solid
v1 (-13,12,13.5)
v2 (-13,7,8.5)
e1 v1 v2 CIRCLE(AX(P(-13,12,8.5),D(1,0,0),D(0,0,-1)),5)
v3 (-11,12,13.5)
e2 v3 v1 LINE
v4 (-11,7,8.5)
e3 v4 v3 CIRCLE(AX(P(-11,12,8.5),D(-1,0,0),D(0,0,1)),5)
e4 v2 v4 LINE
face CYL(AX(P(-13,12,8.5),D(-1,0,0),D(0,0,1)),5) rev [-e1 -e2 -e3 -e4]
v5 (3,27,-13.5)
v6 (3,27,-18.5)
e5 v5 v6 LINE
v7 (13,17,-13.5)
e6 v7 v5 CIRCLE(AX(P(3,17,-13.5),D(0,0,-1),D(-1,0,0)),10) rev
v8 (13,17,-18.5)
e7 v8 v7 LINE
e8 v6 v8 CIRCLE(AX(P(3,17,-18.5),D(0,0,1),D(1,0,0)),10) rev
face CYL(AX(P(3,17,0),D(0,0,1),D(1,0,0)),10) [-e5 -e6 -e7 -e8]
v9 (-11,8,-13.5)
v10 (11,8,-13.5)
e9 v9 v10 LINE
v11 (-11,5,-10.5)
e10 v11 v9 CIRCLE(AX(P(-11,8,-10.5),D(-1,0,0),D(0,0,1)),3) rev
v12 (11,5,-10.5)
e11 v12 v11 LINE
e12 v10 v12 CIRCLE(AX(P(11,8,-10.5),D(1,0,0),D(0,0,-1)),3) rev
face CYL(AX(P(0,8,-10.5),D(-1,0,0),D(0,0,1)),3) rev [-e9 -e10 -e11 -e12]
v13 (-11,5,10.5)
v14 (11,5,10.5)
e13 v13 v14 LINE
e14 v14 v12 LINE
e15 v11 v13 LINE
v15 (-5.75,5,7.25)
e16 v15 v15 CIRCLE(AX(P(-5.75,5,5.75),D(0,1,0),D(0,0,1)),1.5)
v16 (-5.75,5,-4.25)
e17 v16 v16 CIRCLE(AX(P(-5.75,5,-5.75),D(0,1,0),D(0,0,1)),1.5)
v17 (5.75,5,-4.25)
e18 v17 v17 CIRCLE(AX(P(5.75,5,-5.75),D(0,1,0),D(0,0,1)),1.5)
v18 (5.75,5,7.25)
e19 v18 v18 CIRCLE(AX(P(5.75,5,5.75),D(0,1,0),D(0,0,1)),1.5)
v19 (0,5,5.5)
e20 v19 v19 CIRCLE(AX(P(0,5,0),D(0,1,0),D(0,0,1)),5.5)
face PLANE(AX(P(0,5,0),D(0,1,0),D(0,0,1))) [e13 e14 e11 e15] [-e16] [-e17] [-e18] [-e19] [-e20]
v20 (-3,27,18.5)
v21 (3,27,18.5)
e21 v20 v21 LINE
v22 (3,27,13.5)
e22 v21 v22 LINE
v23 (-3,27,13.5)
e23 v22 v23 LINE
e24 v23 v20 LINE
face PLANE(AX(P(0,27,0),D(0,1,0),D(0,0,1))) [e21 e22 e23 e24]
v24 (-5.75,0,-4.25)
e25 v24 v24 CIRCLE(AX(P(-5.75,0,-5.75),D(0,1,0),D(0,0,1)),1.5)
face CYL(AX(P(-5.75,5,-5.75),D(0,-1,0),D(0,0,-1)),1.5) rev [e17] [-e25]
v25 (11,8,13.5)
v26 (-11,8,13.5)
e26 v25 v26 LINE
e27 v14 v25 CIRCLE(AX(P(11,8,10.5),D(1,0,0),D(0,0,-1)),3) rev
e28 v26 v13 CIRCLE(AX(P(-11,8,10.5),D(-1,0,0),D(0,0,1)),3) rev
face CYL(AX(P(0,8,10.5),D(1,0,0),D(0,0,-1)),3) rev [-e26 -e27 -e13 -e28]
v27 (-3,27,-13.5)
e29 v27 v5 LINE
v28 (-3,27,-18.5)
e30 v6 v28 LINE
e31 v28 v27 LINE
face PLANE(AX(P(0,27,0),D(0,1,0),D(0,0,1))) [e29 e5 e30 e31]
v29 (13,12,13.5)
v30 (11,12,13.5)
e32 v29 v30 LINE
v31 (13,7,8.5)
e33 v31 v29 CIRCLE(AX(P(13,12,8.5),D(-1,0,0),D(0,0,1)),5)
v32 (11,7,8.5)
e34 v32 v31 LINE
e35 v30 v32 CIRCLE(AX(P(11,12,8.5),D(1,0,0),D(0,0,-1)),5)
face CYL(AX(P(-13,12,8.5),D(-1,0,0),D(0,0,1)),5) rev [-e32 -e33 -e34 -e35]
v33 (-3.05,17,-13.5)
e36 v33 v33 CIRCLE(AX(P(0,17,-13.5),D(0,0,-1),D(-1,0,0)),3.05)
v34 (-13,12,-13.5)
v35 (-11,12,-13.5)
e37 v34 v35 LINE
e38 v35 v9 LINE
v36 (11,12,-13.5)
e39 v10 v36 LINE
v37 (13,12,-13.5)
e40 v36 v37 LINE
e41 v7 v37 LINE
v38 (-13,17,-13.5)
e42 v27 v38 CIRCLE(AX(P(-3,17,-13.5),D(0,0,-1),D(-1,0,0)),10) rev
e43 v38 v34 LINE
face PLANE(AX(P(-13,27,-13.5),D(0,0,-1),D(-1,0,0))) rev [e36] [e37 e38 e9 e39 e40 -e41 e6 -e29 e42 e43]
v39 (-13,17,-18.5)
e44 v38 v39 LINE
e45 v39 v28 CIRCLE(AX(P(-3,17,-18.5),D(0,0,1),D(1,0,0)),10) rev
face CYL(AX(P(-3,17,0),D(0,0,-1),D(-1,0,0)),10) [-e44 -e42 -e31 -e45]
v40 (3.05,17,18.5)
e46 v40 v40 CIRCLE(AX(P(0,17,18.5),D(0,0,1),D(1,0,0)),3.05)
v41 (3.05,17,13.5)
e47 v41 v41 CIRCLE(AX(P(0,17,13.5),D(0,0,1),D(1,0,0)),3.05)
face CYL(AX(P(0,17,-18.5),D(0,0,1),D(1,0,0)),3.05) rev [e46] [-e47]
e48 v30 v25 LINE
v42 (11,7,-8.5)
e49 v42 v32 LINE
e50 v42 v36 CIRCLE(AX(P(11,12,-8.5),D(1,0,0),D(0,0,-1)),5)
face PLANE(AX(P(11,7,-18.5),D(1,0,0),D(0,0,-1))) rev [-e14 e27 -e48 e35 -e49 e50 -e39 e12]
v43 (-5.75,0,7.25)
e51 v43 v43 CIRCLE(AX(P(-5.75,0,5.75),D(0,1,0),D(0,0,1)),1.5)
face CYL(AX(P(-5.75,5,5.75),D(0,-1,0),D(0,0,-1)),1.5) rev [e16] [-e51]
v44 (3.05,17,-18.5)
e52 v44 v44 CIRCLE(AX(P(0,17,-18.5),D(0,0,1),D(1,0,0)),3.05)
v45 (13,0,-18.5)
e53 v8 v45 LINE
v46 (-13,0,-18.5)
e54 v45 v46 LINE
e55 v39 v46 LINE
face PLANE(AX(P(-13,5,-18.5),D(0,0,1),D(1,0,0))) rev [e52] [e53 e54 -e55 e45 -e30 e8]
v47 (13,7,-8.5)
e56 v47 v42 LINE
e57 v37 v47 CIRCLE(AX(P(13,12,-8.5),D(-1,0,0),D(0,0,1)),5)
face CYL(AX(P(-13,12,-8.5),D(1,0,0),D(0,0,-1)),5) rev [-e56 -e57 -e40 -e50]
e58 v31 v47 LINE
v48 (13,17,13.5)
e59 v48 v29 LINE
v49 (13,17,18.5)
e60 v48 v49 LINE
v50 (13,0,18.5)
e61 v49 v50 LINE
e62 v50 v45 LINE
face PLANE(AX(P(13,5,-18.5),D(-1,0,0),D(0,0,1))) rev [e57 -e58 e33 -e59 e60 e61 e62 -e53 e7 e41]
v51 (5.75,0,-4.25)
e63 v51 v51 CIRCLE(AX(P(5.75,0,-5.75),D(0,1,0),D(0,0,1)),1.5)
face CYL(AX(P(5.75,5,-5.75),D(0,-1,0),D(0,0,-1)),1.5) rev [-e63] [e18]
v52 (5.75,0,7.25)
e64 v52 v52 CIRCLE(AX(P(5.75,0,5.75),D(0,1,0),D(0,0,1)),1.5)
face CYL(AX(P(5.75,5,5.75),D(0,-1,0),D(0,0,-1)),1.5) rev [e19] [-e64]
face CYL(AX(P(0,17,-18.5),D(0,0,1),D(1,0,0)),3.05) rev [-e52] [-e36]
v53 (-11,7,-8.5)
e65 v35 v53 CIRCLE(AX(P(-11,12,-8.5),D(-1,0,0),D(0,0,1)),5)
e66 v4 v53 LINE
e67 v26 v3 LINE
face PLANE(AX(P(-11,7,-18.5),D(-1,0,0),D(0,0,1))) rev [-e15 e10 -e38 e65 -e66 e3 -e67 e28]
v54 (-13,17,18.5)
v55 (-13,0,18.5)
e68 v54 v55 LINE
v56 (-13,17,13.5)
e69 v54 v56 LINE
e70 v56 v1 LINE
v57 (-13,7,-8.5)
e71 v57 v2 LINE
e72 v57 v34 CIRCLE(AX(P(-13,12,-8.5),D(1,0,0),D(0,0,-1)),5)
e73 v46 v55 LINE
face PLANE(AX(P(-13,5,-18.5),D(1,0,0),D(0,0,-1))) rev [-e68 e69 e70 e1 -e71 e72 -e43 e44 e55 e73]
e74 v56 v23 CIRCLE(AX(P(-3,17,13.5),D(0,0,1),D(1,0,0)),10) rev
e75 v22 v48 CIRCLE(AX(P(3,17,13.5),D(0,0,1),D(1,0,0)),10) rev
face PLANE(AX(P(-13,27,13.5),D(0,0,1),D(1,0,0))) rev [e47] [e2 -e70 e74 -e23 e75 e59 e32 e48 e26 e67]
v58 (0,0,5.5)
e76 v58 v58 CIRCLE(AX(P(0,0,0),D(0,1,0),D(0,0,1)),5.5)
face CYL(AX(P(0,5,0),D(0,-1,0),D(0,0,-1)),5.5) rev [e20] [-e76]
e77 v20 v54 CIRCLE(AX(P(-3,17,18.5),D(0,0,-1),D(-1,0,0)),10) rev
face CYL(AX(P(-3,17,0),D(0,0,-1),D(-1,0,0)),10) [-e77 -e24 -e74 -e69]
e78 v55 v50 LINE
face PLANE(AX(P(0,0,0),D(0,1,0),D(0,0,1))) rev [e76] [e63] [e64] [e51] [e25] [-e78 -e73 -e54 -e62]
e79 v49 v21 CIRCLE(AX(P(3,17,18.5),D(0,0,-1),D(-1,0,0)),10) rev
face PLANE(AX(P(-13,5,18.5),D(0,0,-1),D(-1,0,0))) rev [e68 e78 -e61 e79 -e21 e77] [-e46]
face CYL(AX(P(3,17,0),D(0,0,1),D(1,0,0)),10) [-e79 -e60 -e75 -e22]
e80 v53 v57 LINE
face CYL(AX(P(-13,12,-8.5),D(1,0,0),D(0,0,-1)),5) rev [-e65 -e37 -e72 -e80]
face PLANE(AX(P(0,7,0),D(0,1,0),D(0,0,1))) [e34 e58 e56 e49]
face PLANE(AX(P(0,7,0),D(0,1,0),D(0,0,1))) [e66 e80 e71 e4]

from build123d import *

# Parameters (mm, degrees)
SKETCH1_W               = 26
SKETCH1_H               = 37
BOSS_EXTRUDE1_DEPTH     = 5
SKETCH2_R               = 1.5
SKETCH2_R_2             = 5.5
CUT_EXTRUDE1_DEPTH      = 24.157072354
SKETCH3_W               = 26
SKETCH3_H               = 5
BOSS_EXTRUDE2_DEPTH     = 27
CUT_EXTRUDE2_DEPTH      = 36.217183306
CUT_EXTRUDE2_DEPTH_BACK = 36.217183306
SKETCH4_R               = 3.05
FILLET1_R               = 10
FILLET2_R               = 3
SKETCH5_W               = 2
SKETCH5_H               = 37
BOSS_EXTRUDE3_DEPTH     = 7
FILLET3_R               = 5


with BuildPart() as part:
    # Sketch1 → Boss-Extrude1 (new body)
    with BuildSketch(Plane(origin=(0, 0, 0), x_dir=(1, 0, 0), z_dir=(0, 1, 0))):
        Rectangle(SKETCH1_W, SKETCH1_H)
    extrude(amount=BOSS_EXTRUDE1_DEPTH)

    # Sketch2 → Cut-Extrude1 (cut, through all)
    with BuildSketch(Plane(origin=(0, 0, 0), x_dir=(1, 0, 0), z_dir=(0, 1, 0))):
        with Locations(Location((-5.75, 5.75, 0), (0, 0, 270))):
            Circle(SKETCH2_R)
        with Locations(Location((0, 0, 0), (0, 0, 270))):
            Circle(SKETCH2_R_2)
        with Locations(Location((5.75, 5.75, 0), (0, 0, 270))):
            Circle(SKETCH2_R)
        with Locations(Location((5.75, -5.75, 0), (0, 0, 270))):
            Circle(SKETCH2_R)
        with Locations(Location((-5.75, -5.75, 0), (0, 0, 270))):
            Circle(SKETCH2_R)
    extrude(amount=CUT_EXTRUDE1_DEPTH, mode=Mode.SUBTRACT)

    # Sketch3 → Boss-Extrude2 (add)
    with BuildSketch(Plane(origin=(0, 0, 0), x_dir=(1, 0, 0), z_dir=(0, 1, 0))):
        with Locations((0, 16)):
            Rectangle(SKETCH3_W, SKETCH3_H)
        with Locations((0, -16)):
            Rectangle(SKETCH3_W, SKETCH3_H)
    extrude(amount=BOSS_EXTRUDE2_DEPTH)

    # Sketch4 → Cut-Extrude2 (cut, two sides: drawn at the far end of the back side and taken through both)
    with BuildSketch(Plane.XY.offset(-CUT_EXTRUDE2_DEPTH_BACK)):
        with Locations((0, 17)):
            Circle(SKETCH4_R)
    extrude(amount=CUT_EXTRUDE2_DEPTH + CUT_EXTRUDE2_DEPTH_BACK, mode=Mode.SUBTRACT)

    # Fillet1
    fillet1_edges = [part.edges().sort_by_distance(p)[0] for p in [
        (-13, 27, -16),
        (13, 27, -16),
        (13, 27, 16),
        (-13, 27, 16),
    ]]
    fillet(fillet1_edges, radius=FILLET1_R)

    # Fillet2
    fillet2_edges = [part.edges().sort_by_distance(p)[0] for p in [
        (0, 5, -13.5),
        (0, 5, 13.5),
    ]]
    fillet(fillet2_edges, radius=FILLET2_R)

    # Sketch5 → Boss-Extrude3 (add)
    with BuildSketch(Plane(origin=(0, 0, 0), x_dir=(1, 0, 0), z_dir=(0, 1, 0))):
        with Locations((-12, 0)):
            Rectangle(SKETCH5_W, SKETCH5_H)
        with Locations((12, 0)):
            Rectangle(SKETCH5_W, SKETCH5_H)
    extrude(amount=BOSS_EXTRUDE3_DEPTH)

    # Fillet3
    # the kernel refuses this fillet: 5 mm, written as the material it adds along each edge
    with BuildSketch(Plane(origin=(13, 7, -13.328427125), x_dir=(0, 0, 1), z_dir=(-1, 0, 0))) as fillet3_piece_1:
        with BuildLine():
            CenterArc((4.828427125, 5), FILLET3_R, 180, 90)
            Line((-0.171572875, 5), (-0.671572875, 5))
            ThreePointArc((-0.671572875, 5), (-0.671572875, 1), (-0.471404521, -0.166666667))
            Line((-0.471404521, -0.166666667), (0, -0.5))
            Line((0, -0.5), (4.828427125, -0.5))
            Line((4.828427125, -0.5), (4.828427125, 0))
        make_face()
    extrude(amount=2)
    with BuildSketch(Plane(origin=(13, 7, 13.328427125), x_dir=(0, 0, -1), z_dir=(-1, 0, 0)), Plane(origin=(-11, 7, 13.328427125), x_dir=(0, 0, -1), z_dir=(-1, 0, 0))) as fillet3_piece_2:
        with BuildLine():
            CenterArc((4.828427125, -5), FILLET3_R, 90, 90)
            Line((-0.171572875, -5), (-0.671572875, -5))
            ThreePointArc((-0.671572875, -5), (-0.671572875, -1), (-0.471404521, 0.166666667))
            Line((-0.471404521, 0.166666667), (0, 0.5))
            Line((0, 0.5), (4.828427125, 0.5))
            Line((4.828427125, 0.5), (4.828427125, 0))
        make_face()
    extrude(amount=2)
    with BuildSketch(Plane(origin=(-11, 7, -13.328427125), x_dir=(0, 0.9994117743909562, -0.03429439033895371), z_dir=(-1, 0, 0))) as fillet3_piece_3:
        with BuildLine():
            CenterArc((4.831470907, -4.997058872), FILLET3_R, 88.034690809, 90)
            Line((-0.165587965, -4.82558692), (-0.665293852, -4.808439725))
            Line((-0.665293852, -4.808439725), (-0.499705887, 0.017147195))
            Line((-0.499705887, 0.017147195), (-0.150402098, 0.47684296))
            ThreePointArc((-0.150402098, 0.47684296), (1.022442957, 0.636883449), (5.020090054, 0.499705887))
            Line((5.020090054, 0.499705887), (5.002942859, 0))
        make_face()
    extrude(amount=2)


solid = part.part
